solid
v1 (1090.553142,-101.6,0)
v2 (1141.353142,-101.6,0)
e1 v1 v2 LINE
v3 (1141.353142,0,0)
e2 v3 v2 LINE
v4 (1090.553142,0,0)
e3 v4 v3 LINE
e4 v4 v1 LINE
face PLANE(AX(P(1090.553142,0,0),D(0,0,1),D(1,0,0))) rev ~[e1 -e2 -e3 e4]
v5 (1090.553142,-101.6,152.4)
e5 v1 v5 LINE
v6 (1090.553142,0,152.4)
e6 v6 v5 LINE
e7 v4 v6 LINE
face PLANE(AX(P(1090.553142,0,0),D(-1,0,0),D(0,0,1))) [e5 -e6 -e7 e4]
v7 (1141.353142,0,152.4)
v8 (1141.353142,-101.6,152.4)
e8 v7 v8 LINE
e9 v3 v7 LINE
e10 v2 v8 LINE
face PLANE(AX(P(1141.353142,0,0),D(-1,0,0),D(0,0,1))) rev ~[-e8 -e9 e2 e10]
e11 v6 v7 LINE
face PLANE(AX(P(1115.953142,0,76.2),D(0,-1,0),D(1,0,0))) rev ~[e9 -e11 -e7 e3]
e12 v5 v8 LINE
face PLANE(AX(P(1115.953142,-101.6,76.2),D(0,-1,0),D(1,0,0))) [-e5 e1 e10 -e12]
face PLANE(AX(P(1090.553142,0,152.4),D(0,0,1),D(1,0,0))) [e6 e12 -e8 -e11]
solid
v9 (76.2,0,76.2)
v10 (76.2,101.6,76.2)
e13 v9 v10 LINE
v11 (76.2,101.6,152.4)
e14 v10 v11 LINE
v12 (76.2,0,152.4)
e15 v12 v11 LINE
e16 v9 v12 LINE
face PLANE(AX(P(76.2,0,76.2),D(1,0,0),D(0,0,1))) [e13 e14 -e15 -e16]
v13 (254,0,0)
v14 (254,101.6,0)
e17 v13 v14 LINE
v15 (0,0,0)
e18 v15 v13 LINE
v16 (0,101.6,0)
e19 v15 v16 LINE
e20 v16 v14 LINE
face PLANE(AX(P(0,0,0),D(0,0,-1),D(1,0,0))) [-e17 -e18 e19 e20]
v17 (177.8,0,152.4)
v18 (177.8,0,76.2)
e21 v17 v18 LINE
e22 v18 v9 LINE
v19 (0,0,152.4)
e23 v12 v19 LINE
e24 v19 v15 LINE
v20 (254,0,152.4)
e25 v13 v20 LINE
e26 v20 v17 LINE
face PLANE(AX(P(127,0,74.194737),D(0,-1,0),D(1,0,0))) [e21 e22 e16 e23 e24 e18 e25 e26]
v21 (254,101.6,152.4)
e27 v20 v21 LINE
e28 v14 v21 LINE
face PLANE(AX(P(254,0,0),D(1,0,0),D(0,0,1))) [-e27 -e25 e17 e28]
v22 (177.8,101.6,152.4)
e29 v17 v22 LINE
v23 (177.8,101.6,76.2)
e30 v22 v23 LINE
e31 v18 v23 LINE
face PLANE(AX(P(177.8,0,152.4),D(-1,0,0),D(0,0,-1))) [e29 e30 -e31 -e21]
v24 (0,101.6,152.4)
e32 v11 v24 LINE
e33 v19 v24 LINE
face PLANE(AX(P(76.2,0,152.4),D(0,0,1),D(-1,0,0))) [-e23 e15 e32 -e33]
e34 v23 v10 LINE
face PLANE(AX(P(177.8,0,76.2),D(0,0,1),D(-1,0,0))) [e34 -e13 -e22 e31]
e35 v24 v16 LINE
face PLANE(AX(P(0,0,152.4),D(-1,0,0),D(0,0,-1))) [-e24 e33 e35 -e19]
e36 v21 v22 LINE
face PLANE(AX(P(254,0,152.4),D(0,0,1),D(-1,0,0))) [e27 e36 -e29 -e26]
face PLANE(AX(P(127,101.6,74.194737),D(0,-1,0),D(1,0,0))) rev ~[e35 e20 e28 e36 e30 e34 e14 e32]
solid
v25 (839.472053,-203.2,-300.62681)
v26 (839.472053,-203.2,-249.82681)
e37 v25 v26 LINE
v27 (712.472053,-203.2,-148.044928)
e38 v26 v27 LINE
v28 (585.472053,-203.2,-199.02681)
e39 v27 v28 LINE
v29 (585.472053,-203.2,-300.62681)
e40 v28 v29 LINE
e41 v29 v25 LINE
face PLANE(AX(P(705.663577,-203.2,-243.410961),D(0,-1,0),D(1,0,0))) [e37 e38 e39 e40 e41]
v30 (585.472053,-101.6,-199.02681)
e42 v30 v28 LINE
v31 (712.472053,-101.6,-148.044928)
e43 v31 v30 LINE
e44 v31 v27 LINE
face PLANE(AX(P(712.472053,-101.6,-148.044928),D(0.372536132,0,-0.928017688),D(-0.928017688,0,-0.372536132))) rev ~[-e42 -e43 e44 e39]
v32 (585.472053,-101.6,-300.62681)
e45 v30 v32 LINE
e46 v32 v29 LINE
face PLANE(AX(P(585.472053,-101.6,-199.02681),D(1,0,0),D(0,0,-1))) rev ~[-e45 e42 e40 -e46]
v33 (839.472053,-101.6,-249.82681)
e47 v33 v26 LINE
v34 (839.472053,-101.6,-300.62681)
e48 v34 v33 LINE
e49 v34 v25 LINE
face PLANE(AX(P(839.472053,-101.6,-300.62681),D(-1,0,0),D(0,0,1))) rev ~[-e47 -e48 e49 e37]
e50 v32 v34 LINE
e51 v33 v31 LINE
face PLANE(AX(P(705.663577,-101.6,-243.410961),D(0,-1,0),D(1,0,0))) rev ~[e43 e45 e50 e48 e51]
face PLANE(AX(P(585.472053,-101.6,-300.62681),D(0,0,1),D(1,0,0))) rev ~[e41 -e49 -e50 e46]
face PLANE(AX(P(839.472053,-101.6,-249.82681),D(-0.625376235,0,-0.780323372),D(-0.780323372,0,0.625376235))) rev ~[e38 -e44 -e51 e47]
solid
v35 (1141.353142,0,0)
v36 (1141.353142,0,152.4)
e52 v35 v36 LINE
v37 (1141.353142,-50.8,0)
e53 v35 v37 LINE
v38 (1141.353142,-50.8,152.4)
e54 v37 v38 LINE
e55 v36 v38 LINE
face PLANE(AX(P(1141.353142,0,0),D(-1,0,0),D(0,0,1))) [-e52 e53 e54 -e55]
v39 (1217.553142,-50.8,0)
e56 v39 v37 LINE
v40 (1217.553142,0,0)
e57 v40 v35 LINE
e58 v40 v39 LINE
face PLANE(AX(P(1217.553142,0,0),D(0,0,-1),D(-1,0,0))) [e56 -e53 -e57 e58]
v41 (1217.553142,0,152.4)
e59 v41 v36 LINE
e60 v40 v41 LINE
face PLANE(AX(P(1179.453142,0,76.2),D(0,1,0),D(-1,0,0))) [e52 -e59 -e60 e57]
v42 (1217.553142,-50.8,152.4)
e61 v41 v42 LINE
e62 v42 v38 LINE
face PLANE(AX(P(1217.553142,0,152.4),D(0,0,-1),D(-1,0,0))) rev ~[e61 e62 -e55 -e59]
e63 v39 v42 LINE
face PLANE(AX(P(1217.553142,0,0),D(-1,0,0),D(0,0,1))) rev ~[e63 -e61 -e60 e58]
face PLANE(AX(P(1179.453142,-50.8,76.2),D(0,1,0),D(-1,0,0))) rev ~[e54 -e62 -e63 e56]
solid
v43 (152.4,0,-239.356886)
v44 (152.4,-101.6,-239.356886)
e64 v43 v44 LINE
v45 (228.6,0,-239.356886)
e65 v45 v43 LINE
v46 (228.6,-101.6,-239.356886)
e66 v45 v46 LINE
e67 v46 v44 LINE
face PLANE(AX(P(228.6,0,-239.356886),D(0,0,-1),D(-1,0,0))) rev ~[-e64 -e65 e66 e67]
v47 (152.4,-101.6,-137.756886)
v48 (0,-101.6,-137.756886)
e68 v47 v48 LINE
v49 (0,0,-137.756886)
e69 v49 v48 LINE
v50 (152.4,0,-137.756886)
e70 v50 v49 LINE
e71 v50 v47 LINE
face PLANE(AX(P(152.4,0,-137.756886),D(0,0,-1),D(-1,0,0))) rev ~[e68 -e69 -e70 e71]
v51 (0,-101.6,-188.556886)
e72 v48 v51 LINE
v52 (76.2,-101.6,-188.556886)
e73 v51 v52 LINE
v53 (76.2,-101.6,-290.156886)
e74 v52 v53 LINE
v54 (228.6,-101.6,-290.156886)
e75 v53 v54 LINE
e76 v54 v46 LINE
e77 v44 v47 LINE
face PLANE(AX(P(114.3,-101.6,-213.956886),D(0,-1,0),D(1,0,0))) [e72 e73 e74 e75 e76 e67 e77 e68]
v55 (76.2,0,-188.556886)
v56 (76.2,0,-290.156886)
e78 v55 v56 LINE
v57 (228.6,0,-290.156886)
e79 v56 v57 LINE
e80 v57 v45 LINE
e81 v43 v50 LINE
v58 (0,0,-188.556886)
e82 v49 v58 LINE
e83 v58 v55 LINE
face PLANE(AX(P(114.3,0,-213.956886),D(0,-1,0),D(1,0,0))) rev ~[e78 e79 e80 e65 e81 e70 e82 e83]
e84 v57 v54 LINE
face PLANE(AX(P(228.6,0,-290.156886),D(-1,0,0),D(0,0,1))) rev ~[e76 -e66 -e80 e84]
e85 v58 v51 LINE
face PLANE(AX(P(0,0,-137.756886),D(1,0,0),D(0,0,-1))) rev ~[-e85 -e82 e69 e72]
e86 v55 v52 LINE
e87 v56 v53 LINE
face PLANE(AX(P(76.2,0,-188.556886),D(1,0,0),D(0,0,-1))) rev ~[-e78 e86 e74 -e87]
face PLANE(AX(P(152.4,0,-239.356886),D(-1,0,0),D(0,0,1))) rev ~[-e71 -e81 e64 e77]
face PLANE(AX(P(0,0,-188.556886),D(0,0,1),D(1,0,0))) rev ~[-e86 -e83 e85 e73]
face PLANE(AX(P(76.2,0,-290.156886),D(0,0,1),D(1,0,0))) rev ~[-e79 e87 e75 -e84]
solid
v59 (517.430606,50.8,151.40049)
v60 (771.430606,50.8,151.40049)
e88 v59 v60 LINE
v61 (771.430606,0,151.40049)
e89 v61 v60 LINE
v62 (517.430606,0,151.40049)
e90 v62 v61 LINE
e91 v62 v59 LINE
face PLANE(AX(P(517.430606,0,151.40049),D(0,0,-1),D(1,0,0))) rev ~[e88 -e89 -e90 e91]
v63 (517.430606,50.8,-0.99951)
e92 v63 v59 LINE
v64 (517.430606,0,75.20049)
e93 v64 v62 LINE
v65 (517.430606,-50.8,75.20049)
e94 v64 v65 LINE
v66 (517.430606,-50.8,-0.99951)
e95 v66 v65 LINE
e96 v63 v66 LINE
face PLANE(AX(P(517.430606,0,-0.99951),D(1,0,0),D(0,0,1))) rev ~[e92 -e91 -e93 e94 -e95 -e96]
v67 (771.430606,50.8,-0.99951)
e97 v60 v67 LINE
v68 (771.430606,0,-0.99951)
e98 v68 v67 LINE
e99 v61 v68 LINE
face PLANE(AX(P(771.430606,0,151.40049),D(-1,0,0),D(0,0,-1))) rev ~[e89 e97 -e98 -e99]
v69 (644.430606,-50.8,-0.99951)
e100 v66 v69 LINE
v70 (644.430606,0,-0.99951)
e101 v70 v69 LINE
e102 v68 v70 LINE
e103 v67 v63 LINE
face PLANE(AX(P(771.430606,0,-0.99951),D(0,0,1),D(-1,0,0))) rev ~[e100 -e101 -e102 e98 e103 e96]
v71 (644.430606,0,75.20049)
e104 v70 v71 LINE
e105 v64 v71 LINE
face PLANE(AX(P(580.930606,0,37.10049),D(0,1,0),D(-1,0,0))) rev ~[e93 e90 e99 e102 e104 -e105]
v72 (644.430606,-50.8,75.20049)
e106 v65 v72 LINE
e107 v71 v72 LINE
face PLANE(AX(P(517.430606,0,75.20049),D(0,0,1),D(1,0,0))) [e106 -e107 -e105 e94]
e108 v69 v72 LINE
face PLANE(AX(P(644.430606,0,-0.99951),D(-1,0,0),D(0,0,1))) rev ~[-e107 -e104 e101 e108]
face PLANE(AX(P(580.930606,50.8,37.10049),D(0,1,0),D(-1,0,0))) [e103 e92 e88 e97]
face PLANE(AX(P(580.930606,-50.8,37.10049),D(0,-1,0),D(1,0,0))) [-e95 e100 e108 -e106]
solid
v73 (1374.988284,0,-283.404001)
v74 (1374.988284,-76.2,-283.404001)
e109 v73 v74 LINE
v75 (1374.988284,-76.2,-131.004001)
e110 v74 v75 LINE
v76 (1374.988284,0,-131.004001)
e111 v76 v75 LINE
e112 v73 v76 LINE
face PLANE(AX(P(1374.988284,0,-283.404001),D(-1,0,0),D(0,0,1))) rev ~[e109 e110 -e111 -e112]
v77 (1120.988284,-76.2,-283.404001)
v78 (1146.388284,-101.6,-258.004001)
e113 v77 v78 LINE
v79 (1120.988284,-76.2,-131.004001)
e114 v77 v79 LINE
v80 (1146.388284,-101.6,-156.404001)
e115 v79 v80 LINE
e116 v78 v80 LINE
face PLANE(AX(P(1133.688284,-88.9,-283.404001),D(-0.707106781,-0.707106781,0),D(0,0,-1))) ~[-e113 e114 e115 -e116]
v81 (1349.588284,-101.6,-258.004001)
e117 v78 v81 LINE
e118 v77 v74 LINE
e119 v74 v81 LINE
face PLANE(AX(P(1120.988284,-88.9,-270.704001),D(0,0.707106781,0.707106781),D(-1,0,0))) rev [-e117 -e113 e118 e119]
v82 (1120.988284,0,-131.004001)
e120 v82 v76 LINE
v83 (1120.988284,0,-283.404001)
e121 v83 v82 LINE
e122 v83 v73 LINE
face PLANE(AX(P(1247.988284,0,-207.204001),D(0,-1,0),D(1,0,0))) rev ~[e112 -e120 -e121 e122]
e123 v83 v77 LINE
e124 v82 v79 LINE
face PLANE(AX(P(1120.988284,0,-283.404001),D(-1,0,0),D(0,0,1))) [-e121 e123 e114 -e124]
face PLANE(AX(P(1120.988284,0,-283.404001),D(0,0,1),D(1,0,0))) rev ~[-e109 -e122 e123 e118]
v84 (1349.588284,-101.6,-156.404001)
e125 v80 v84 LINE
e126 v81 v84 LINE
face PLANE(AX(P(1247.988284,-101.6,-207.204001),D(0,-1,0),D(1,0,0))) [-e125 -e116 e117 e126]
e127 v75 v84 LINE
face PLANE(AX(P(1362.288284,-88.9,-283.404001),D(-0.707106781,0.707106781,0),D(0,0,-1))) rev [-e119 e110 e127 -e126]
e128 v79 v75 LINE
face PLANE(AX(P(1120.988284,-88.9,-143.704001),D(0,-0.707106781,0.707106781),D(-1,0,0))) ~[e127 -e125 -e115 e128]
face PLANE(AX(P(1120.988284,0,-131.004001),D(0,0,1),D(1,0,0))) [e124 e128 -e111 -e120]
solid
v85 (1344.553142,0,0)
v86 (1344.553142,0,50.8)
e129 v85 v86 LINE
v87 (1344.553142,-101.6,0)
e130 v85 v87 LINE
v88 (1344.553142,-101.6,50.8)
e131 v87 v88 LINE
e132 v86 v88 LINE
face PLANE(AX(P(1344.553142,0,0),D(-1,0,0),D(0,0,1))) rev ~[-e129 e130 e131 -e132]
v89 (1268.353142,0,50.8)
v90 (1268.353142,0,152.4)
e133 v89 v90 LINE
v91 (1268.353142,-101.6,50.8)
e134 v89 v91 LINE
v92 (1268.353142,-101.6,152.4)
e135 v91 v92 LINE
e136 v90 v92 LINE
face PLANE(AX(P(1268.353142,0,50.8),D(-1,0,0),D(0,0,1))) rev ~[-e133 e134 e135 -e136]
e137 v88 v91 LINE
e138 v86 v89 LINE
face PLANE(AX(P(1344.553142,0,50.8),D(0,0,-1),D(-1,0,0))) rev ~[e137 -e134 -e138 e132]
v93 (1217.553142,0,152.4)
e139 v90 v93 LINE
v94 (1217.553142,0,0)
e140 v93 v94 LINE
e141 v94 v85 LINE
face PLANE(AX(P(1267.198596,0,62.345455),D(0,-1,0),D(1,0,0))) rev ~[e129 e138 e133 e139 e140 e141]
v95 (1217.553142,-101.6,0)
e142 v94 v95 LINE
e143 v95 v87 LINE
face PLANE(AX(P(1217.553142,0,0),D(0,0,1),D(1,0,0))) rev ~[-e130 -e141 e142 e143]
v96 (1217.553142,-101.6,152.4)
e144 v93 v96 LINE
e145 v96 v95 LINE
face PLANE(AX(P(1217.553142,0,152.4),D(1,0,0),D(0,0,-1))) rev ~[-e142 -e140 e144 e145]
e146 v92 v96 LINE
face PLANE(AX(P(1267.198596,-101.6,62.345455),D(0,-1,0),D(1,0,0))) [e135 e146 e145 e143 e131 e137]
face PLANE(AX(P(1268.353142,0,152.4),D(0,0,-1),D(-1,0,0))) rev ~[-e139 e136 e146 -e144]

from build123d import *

# Parameters (mm, degrees)
F1_DEPTH  = 101.6
F2_W      = 127
F2_H      = 76.2
F3_DEPTH  = 50.8
F4_W      = 127
F4_H      = 76.2
F5_DEPTH  = 50.8
F7_DEPTH  = 101.6
F6_W      = 50.8
F6_H      = 152.4
F8_W      = 76.2
F8_H      = 152.4
F9_DEPTH  = 50.8
F11_DEPTH = 101.6
F13_W     = 254
F13_H     = 152.4
F14_DEPTH = 101.6
F15_DEPTH = 101.6
F16_SIZE  = 25.4


# Not quite as in the source:
# - a feature names something its author has since deleted; it is built from what else it names


with BuildPart() as f1:
    # F0 (on Front) → F1 (new body)
    with BuildSketch(Plane.XZ):
        Polygon((0, 152.4), (0, 0), (254, 0), (254, 152.4), (177.8, 152.4), (177.8, 76.2), (76.2, 76.2), (76.2, 152.4), align=None)
    extrude(amount=-F1_DEPTH)


with BuildPart() as f3:
    # F2 (on Front) → F3 (new body)
    with BuildSketch(Plane.XZ):
        with Locations((580.9306057492, 37.1004903008)):
            Rectangle(F2_W, F2_H)
    extrude(amount=F3_DEPTH)

    # F4 (on face) → F5 (join)
    with BuildSketch(Plane(origin=(0, 0, 0), x_dir=(-1, 0, 0), z_dir=(0, 1, 0))):
        with Locations((-580.9306057492, 37.1004903008)):
            Rectangle(F4_W, F4_H)
        Polygon((-771.4306057492, -0.9995096992), (-644.4306057492, -0.9995096992), (-644.4306057492, 75.2004903008), (-517.4306057492, 75.2004903008), (-517.4306057492, 151.4004903008), (-771.4306057492, 151.4004903008), align=None)
    extrude(amount=F5_DEPTH)


with BuildPart() as f7:
    # F6 (on face) → F7 (new body)
    with BuildSketch(Plane.XZ):
        Polygon((1268.3531419389, 152.4), (1217.5531419389, 152.4), (1217.5531419389, 0), (1344.5531419389, 0), (1344.5531419389, 50.8), (1268.3531419389, 50.8), align=None)
    extrude(amount=F7_DEPTH)


with BuildPart() as f7b:
    # F6 (on face) → F7, piece 2 (new body)
    with BuildSketch(Plane.XZ):
        with Locations((1115.9531419389, 76.2)):
            Rectangle(F6_W, F6_H)
    extrude(amount=F7_DEPTH)


with BuildPart() as f9:
    # F8 (on face) → F9 (new body)
    with BuildSketch(Plane(origin=(0, 0, 0), x_dir=(-1, 0, 0), z_dir=(0, 1, 0))):
        with Locations((-1179.4531419389, 76.2)):
            Rectangle(F8_W, F8_H)
    extrude(amount=-F9_DEPTH)


with BuildPart() as f11:
    # F10 (on face) → F11 (new body)
    with BuildSketch(Plane.XZ):
        Polygon((152.4, -137.7568855792), (0, -137.7568855792), (0, -188.5568855792), (76.2, -188.5568855792), (76.2, -290.1568855792), (228.6, -290.1568855792), (228.6, -239.3568855792), (152.4, -239.3568855792), align=None)
    extrude(amount=F11_DEPTH)


with BuildPart() as f14:
    # F13 (on face) → F14 (new body)
    with BuildSketch(Plane.XZ):
        with Locations((1247.9882836342, -207.20400113)):
            Rectangle(F13_W, F13_H)
    extrude(amount=F14_DEPTH)

    # F16
    f16_edges = [f14.edges().sort_by_distance(p)[0] for p in [
        (1247.988284, -101.6, -131.004001),
        (1374.988284, -101.6, -207.204001),
        (1247.988284, -101.6, -283.404001),
        (1120.988284, -101.6, -207.204001),
    ]]
    chamfer(f16_edges, length=F16_SIZE)


with BuildPart() as f15:
    # F12 (on face) → F15 (new body)
    with BuildSketch(Plane.XZ.offset(101.6)):
        Polygon((585.472053026, -199.0268103926), (585.472053026, -300.6268103926), (839.472053026, -300.6268103926), (839.472053026, -249.8268103926), (712.472053026, -148.0449278362), align=None)
    extrude(amount=F15_DEPTH)


solid = Compound([f1.part, f3.part, f7.part, f7b.part, f9.part, f11.part, f14.part, f15.part])
